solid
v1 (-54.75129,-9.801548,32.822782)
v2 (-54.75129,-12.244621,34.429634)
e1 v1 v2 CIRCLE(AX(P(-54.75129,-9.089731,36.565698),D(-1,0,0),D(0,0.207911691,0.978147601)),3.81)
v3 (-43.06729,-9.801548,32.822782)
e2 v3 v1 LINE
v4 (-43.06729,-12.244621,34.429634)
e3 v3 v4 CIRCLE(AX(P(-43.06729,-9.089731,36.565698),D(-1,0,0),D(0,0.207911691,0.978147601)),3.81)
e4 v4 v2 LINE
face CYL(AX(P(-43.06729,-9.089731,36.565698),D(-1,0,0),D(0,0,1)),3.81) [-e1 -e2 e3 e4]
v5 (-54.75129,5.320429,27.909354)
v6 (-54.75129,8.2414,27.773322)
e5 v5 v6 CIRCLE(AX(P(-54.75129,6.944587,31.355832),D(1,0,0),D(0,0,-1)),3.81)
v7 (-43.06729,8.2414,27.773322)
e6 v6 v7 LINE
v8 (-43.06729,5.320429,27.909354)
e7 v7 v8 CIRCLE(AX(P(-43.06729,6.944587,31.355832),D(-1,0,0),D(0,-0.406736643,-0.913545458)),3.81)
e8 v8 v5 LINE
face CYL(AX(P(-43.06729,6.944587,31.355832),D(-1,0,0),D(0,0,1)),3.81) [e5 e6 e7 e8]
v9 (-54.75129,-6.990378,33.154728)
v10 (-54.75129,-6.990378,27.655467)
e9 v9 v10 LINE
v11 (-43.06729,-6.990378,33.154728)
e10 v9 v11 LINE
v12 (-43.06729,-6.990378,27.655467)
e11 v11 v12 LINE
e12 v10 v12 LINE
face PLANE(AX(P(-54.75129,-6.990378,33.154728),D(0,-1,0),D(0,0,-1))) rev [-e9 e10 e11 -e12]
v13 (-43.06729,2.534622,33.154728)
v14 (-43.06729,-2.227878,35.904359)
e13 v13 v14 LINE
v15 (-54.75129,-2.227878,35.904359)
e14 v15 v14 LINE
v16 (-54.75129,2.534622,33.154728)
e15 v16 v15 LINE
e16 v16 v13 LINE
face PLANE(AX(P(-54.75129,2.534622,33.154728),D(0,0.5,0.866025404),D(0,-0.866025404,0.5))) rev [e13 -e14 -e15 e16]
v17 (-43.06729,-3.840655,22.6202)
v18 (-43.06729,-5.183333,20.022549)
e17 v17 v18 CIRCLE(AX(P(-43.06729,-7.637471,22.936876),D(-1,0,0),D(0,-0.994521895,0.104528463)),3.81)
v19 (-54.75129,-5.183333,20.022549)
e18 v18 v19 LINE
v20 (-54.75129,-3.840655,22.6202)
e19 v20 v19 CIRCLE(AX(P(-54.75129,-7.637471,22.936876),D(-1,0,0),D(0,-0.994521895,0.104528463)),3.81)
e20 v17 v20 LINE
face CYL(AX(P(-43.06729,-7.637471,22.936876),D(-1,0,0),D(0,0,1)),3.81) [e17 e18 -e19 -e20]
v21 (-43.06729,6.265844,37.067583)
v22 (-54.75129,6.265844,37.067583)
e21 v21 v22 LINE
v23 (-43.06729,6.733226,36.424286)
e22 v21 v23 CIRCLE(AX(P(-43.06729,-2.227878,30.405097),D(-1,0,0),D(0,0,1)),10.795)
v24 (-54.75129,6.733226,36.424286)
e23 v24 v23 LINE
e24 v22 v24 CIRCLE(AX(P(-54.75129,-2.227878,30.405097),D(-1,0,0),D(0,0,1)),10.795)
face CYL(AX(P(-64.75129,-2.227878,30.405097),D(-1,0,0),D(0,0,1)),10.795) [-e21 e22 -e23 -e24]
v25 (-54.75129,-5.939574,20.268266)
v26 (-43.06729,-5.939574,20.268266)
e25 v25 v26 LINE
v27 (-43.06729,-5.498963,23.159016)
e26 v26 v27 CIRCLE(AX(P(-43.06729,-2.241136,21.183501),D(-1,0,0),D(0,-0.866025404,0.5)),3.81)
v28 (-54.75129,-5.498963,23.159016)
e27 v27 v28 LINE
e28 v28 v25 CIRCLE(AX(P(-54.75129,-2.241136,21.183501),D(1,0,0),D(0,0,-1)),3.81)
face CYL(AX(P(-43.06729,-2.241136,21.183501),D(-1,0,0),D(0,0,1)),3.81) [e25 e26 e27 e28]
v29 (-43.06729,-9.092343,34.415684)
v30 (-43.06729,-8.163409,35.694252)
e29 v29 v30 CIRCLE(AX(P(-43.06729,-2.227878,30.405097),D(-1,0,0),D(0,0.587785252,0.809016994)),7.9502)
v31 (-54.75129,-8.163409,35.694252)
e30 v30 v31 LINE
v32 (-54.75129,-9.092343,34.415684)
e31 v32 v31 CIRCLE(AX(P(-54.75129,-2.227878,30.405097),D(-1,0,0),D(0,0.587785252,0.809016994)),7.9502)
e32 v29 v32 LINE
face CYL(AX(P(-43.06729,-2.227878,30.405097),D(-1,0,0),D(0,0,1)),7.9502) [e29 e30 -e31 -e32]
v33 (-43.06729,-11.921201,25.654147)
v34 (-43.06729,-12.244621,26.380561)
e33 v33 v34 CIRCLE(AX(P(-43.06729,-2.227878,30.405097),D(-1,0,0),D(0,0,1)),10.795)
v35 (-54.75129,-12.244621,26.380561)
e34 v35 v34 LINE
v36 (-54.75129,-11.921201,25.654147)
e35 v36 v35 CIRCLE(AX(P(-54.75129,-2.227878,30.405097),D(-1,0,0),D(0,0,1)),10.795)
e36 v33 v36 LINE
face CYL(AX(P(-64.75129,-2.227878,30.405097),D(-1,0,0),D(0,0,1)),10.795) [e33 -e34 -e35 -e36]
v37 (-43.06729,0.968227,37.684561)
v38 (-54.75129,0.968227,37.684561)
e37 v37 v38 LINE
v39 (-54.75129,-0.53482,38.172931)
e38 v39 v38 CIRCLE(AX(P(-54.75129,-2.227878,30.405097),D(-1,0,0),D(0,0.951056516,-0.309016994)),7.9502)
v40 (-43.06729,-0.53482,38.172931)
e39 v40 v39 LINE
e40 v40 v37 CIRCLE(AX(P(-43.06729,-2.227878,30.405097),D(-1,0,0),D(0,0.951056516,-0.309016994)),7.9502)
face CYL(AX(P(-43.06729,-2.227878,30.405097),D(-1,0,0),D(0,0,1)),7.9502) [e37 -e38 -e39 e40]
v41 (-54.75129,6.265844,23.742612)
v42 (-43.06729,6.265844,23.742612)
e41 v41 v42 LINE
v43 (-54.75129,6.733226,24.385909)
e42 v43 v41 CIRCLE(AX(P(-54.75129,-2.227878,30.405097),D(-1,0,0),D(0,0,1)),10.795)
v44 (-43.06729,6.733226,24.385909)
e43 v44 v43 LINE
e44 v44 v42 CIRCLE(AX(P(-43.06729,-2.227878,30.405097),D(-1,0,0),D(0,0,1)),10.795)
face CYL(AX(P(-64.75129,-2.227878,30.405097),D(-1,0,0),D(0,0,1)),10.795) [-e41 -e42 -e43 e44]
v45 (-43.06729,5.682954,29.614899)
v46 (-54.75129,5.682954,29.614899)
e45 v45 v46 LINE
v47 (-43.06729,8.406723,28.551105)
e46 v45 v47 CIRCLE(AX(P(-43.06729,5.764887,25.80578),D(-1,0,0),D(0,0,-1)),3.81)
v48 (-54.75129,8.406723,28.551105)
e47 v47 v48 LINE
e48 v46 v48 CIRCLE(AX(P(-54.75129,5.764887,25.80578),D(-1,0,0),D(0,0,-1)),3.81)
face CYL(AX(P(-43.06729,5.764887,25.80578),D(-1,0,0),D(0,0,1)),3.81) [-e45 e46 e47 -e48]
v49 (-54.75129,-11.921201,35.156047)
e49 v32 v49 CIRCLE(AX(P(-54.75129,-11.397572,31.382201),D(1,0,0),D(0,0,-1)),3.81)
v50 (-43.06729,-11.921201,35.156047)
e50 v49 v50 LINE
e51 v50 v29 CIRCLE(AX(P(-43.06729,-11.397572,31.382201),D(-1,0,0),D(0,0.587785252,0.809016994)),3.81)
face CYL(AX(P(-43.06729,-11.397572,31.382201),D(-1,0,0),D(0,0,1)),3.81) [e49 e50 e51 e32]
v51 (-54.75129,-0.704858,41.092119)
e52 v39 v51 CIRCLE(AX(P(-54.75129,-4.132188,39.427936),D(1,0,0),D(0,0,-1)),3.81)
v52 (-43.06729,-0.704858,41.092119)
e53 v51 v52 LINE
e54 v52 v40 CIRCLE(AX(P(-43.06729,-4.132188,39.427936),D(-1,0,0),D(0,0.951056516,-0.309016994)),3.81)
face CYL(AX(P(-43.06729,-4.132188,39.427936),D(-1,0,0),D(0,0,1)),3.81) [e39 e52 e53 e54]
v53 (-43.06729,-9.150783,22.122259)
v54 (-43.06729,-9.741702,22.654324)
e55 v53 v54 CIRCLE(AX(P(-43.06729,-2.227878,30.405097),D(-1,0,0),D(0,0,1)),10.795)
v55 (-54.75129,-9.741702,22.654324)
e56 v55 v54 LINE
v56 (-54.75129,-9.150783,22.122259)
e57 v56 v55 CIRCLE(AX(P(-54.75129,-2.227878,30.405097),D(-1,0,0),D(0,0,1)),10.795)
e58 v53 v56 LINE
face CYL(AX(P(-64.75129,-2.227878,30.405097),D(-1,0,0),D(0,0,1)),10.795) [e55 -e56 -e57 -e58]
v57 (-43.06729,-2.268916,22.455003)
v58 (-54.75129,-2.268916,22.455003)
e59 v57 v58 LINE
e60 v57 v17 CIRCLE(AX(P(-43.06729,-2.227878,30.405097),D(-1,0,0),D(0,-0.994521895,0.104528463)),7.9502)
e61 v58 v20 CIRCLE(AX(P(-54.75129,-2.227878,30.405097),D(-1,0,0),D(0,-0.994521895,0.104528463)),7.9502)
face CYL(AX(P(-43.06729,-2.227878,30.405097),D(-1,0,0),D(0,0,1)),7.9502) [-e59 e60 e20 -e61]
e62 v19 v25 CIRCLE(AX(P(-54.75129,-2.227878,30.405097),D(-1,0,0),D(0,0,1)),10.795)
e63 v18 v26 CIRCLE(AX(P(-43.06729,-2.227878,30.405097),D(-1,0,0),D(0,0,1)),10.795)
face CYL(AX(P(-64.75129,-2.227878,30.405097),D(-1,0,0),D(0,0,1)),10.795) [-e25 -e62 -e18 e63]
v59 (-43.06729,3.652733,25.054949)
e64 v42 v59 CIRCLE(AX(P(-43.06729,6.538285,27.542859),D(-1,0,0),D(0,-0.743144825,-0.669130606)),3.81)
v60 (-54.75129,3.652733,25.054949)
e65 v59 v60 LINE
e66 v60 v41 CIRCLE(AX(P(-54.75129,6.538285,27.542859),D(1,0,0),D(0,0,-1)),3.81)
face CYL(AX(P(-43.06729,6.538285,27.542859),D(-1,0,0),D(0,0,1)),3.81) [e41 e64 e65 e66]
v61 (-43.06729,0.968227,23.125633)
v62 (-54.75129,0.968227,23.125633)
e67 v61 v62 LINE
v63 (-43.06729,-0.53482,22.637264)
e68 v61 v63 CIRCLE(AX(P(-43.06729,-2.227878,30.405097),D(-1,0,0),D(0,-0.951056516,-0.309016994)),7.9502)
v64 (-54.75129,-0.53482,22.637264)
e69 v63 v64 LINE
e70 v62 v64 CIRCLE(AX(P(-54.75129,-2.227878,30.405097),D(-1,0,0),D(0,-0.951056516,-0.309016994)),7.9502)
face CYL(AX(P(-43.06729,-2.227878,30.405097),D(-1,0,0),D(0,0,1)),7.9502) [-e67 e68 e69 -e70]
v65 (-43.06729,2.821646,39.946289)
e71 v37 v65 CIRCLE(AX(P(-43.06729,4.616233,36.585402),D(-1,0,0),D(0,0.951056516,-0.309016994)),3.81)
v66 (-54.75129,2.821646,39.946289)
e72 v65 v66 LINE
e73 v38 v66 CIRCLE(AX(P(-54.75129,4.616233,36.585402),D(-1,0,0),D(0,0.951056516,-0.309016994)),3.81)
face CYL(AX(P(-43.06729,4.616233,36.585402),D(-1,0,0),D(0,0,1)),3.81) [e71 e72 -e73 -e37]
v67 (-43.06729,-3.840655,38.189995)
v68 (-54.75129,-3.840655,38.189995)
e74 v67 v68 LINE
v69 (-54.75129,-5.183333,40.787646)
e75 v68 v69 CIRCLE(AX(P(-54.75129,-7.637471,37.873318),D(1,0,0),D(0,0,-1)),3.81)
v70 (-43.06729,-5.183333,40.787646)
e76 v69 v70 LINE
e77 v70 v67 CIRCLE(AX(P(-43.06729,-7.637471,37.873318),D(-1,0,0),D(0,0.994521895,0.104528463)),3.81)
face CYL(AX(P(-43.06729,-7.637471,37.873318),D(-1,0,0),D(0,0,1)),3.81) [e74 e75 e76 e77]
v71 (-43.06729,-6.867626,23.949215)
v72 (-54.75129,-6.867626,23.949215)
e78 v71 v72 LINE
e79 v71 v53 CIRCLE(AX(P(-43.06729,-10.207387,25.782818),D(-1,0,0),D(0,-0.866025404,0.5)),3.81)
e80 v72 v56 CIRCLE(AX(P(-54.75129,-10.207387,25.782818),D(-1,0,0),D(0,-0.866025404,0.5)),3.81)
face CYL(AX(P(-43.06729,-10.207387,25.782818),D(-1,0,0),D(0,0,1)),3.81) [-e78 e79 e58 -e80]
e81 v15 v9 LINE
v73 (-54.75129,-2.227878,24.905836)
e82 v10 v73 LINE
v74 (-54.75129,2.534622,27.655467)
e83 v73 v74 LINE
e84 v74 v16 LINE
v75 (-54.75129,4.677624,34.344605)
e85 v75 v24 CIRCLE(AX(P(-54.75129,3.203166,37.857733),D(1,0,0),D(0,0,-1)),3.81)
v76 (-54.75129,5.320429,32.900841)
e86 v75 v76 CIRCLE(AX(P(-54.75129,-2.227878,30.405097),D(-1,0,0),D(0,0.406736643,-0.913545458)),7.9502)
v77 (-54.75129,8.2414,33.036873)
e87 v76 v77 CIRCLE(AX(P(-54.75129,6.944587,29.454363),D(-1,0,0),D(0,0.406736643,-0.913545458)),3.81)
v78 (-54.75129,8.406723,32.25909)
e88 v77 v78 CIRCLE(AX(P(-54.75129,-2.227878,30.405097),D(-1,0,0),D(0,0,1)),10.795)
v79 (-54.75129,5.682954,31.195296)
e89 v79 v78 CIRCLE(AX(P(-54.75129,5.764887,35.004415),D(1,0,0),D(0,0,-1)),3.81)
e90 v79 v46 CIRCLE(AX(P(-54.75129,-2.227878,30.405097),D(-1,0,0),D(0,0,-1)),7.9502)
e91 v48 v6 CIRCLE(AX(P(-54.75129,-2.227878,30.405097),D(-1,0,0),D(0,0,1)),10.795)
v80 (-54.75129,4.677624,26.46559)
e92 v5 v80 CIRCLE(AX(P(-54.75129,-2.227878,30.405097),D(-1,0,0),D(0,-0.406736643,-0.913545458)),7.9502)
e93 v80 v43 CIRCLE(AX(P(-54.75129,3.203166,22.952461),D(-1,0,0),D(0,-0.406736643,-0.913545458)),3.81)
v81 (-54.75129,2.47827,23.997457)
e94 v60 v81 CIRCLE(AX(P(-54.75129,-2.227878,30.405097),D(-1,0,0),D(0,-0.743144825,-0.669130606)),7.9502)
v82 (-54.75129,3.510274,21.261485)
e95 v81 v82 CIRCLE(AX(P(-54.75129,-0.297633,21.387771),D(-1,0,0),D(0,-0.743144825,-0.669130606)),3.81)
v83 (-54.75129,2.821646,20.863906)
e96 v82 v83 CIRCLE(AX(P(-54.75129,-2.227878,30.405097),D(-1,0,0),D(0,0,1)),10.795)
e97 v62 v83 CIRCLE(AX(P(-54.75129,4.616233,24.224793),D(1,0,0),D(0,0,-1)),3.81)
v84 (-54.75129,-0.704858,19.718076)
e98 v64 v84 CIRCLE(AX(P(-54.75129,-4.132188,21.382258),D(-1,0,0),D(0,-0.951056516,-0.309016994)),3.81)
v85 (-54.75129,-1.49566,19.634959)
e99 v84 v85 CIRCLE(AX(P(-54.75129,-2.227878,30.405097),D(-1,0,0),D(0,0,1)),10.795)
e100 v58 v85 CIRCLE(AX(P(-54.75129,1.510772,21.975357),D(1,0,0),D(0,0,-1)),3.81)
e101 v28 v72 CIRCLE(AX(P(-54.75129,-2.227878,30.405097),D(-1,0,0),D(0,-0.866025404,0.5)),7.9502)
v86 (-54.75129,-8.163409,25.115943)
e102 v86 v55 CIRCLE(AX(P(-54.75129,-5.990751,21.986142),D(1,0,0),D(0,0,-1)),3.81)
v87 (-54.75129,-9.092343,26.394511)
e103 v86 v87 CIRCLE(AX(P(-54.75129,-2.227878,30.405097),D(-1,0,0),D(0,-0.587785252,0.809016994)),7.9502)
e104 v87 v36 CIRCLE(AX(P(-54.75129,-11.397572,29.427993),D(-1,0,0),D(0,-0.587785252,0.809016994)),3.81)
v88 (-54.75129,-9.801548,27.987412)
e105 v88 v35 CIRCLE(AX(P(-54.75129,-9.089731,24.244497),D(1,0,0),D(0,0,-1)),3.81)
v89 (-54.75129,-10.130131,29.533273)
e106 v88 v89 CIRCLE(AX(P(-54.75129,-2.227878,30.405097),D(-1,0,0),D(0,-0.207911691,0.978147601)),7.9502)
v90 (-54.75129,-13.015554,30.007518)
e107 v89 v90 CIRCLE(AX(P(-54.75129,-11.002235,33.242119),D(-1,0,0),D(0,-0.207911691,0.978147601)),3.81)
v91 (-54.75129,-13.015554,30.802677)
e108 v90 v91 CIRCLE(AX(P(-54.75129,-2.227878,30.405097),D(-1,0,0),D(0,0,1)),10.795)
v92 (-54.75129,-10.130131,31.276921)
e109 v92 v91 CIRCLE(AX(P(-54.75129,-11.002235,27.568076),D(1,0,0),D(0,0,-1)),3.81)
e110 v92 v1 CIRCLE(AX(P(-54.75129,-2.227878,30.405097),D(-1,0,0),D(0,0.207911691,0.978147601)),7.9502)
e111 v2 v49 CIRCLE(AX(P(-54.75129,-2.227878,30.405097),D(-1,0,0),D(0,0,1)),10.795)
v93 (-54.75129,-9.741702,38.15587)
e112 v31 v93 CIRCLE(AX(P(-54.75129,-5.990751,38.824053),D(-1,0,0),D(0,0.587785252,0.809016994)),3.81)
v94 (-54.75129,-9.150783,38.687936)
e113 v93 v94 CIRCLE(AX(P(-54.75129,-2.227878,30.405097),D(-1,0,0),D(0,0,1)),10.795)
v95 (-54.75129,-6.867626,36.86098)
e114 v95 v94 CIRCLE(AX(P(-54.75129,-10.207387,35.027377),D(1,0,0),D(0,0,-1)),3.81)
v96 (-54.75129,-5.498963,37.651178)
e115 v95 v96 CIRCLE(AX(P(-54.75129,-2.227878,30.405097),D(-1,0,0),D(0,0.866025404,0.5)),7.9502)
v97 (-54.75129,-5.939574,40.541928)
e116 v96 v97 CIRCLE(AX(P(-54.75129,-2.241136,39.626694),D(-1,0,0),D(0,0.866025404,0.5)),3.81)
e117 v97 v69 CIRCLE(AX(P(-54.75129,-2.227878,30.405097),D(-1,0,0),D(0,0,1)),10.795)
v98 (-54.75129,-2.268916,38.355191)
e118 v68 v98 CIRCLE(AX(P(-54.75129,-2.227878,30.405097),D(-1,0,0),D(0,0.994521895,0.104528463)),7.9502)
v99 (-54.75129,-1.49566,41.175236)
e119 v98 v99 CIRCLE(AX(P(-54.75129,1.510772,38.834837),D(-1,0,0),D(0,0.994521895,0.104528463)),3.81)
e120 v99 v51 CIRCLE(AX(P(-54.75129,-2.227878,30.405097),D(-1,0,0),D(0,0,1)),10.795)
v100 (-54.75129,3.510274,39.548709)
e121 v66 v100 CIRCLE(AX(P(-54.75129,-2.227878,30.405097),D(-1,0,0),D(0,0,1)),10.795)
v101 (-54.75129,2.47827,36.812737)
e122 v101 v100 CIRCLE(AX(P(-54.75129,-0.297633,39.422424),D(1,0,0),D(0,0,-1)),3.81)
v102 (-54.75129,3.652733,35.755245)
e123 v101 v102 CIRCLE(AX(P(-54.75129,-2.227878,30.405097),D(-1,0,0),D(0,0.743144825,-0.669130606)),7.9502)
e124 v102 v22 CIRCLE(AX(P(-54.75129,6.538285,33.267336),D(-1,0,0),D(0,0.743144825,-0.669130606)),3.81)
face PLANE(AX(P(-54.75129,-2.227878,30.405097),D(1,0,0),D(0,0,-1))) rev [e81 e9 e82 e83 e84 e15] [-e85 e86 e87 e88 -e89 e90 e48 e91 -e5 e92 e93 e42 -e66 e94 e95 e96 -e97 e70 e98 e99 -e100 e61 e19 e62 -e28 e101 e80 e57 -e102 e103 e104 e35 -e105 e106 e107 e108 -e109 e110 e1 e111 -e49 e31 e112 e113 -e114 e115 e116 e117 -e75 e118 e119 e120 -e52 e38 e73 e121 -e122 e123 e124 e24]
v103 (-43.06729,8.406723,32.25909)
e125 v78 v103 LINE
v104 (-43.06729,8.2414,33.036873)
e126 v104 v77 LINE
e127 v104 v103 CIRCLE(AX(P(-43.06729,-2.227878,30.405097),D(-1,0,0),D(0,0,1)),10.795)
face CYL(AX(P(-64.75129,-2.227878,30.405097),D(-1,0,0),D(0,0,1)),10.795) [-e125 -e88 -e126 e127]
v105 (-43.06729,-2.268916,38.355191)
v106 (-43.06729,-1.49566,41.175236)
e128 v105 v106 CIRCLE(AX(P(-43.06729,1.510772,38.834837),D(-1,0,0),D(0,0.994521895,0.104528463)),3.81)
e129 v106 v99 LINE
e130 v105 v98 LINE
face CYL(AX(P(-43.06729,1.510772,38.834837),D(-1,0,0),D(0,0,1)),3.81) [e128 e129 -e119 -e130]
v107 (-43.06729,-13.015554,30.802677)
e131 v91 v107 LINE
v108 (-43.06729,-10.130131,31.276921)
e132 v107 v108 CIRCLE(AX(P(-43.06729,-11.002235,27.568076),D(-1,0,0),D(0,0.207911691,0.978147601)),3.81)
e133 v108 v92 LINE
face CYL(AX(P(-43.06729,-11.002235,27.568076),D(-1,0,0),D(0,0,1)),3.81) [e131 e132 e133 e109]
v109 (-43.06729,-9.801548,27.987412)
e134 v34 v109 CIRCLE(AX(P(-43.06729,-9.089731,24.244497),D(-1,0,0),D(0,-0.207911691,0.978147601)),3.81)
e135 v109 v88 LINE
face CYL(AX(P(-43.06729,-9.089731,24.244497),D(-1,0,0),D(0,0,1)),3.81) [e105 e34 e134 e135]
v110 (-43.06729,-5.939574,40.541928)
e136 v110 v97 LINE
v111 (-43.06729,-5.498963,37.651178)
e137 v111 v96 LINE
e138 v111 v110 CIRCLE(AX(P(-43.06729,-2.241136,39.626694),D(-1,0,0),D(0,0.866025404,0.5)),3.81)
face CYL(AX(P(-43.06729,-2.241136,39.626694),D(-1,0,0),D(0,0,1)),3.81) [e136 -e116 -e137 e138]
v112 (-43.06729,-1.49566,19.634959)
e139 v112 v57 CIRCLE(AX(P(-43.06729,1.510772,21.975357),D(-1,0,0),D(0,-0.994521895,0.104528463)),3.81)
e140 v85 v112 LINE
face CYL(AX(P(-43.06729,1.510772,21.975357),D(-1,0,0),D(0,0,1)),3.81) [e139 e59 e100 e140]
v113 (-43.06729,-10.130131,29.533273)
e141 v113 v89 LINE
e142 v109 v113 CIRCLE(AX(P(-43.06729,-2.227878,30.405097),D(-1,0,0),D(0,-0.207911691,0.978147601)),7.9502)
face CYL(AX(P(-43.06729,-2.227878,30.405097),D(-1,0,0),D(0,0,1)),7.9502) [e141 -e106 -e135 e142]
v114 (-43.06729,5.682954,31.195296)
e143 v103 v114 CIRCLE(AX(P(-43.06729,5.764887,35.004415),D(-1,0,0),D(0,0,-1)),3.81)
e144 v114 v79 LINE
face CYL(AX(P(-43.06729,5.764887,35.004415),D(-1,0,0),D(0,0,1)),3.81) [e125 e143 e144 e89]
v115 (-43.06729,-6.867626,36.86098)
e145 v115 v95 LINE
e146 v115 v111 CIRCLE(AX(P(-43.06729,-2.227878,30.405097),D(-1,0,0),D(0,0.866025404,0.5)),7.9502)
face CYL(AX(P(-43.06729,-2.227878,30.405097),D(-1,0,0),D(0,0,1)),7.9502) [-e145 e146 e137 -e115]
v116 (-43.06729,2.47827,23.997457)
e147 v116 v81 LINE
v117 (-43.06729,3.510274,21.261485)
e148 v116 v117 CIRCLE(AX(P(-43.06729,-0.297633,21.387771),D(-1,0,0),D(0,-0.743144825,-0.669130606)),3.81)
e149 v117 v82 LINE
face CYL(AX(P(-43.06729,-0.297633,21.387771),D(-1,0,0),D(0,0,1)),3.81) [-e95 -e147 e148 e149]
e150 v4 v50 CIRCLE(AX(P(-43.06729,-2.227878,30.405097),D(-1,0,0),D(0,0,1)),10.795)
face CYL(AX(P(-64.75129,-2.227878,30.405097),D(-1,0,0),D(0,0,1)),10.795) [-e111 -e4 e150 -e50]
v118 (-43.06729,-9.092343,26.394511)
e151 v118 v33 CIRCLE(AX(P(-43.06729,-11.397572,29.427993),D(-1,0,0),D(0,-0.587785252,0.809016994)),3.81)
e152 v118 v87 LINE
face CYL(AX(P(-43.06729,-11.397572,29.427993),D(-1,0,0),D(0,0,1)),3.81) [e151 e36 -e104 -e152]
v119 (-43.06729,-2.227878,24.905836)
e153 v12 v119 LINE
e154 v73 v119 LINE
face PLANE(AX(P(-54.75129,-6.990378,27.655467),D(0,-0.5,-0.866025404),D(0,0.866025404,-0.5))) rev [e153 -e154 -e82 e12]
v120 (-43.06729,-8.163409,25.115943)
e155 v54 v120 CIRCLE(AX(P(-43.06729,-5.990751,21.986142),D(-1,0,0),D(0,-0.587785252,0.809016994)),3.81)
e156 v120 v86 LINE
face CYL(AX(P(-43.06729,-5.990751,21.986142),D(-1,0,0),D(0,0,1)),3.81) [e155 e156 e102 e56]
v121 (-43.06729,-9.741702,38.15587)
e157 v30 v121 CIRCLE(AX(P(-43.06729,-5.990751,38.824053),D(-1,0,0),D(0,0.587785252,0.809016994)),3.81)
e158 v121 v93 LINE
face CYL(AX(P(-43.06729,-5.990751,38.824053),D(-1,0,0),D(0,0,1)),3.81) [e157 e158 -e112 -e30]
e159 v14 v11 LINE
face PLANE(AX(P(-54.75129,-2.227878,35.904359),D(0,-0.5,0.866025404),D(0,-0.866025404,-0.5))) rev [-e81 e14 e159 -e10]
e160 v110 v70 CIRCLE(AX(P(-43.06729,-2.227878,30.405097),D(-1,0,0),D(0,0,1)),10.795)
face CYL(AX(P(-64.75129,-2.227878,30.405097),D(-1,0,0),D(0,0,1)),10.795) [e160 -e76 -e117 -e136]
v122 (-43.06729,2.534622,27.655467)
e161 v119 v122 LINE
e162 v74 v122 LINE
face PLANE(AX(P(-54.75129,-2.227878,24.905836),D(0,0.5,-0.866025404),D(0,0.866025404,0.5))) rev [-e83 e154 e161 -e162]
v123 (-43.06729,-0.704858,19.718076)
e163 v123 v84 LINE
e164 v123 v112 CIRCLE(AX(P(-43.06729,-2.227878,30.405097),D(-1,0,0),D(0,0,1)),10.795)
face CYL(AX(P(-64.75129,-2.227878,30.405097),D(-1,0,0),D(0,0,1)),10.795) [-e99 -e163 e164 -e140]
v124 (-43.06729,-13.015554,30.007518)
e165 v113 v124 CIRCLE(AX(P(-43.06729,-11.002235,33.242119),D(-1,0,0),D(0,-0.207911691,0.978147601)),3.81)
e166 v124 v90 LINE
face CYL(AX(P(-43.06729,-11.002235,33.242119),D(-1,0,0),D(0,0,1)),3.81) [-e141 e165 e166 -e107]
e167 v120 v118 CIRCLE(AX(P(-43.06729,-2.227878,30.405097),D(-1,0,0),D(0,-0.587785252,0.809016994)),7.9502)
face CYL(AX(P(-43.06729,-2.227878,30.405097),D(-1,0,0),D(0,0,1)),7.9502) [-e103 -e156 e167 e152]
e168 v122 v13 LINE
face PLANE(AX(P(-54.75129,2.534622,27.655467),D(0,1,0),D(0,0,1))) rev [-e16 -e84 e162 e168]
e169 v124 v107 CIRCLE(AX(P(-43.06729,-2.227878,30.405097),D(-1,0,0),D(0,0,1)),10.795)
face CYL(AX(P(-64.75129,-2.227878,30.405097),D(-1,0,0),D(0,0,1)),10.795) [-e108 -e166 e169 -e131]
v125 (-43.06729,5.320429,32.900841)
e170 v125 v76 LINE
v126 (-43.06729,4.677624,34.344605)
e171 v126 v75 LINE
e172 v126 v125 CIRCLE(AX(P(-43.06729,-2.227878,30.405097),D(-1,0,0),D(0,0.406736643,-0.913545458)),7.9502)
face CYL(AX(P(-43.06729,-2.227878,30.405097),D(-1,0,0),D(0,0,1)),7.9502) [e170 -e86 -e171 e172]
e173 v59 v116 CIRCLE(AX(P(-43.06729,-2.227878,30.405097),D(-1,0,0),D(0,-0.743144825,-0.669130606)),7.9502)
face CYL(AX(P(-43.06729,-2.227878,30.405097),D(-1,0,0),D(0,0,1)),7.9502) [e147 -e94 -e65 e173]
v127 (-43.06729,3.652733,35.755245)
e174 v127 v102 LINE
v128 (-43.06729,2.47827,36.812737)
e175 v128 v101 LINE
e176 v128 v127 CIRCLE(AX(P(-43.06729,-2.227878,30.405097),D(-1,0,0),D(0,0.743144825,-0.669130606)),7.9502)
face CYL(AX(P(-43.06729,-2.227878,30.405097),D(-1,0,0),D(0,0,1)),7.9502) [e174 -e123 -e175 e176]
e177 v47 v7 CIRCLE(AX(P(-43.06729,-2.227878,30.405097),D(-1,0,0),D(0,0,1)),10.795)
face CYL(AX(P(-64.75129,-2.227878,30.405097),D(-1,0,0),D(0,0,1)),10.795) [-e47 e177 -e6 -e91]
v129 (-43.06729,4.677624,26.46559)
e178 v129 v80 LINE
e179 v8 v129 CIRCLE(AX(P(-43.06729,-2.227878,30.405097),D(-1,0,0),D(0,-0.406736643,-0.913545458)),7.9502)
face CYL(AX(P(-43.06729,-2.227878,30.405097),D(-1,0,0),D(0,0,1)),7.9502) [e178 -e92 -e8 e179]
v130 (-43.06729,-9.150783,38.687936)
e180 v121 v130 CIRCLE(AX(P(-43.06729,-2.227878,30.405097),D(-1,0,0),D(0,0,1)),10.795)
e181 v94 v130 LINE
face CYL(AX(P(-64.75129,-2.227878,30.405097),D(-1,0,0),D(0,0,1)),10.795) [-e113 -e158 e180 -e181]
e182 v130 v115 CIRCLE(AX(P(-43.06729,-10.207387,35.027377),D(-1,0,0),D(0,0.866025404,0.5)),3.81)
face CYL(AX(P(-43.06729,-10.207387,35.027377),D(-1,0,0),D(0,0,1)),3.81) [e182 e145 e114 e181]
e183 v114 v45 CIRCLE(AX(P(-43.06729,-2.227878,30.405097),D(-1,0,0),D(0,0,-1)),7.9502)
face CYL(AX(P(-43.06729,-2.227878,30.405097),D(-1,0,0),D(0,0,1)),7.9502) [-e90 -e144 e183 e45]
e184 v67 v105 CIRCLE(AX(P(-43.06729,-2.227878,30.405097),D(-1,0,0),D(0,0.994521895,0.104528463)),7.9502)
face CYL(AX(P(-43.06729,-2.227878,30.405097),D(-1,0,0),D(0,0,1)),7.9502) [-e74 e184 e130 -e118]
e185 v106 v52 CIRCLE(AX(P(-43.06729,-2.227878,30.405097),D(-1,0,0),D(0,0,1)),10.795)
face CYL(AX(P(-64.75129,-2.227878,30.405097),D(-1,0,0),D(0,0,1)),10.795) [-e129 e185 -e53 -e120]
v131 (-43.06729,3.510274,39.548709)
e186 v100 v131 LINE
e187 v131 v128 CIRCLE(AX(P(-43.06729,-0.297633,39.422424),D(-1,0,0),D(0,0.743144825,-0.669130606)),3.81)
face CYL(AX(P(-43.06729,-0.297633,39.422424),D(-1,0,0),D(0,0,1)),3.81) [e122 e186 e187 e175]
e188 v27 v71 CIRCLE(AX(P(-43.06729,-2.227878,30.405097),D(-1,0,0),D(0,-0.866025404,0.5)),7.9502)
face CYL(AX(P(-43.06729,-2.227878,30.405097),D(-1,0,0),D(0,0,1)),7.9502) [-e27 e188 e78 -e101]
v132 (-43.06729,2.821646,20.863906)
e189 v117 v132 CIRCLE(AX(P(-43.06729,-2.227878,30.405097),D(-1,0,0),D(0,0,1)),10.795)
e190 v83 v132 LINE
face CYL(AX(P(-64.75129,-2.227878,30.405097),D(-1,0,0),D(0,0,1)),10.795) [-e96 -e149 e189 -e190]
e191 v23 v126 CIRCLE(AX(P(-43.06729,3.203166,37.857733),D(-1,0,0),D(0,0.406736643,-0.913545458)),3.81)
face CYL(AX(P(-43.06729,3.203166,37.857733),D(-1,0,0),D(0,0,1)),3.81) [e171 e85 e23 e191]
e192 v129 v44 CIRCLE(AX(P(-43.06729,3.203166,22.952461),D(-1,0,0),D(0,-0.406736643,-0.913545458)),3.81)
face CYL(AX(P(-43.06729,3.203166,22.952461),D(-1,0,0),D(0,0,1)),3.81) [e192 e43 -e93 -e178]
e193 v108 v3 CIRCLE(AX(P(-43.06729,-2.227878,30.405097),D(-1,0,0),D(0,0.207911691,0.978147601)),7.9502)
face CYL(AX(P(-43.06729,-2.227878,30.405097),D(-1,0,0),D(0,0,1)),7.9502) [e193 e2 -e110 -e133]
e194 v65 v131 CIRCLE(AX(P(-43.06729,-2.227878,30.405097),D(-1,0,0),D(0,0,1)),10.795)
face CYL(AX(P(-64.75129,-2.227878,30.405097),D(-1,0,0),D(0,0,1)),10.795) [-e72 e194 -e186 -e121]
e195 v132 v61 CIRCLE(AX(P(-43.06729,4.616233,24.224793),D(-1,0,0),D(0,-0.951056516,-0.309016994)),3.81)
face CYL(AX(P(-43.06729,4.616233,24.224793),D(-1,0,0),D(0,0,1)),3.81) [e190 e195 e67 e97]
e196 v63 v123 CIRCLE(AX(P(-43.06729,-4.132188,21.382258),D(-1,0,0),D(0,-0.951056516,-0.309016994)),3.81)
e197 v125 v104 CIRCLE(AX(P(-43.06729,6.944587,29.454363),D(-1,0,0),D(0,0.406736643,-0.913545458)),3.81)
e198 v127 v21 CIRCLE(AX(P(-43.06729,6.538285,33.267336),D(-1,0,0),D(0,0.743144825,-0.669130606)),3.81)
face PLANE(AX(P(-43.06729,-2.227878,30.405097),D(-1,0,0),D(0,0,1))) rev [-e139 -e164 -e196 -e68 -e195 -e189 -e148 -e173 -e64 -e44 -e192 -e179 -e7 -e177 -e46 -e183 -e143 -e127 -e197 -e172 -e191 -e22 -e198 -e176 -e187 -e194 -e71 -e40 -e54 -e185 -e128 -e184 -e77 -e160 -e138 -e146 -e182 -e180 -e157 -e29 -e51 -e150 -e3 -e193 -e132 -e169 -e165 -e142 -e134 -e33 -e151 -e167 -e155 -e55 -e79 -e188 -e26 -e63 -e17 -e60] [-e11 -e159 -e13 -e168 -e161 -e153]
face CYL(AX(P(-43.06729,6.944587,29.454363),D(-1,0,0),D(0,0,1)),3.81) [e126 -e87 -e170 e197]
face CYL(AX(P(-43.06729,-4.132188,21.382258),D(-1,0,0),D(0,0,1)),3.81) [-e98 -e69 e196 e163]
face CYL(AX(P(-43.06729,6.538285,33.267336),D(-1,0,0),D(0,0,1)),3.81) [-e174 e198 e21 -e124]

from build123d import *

# Parameters (mm, degrees)
SPUR_START             = -54.751290346
SPUR_GEAR_AI_OUTLINE_R = 4.7625
SPUR_GEAR_AI_DEPTH     = 11.684
CUT_EXTRUDE1_DEPTH     = 45.73825268


# Read off the part's stored shape, not the designer's step: spur gear_ai
with BuildPart() as part:
    # spur gear_ai outline → spur gear_ai (new body)
    with BuildSketch(Plane.YZ.offset(SPUR_START)):
        with BuildLine():
            ThreePointArc((6.265843754, 23.742611923), (6.505460201, 24.059955507), (6.73322633, 24.385908852))
            ThreePointArc((6.73322633, 24.385908852), (5.912883536, 25.630805773), (4.677624003, 26.465589895))
            ThreePointArc((4.677624003, 26.465589895), (5.034990844, 27.171459646), (5.320429206, 27.90935402))
            ThreePointArc((5.320429206, 27.90935402), (6.767344667, 27.549956895), (8.241399844, 27.773322024))
            ThreePointArc((8.241399844, 27.773322024), (8.331225097, 28.160690604), (8.40672264, 28.551104632))
            ThreePointArc((8.40672264, 28.551104632), (7.150957012, 29.354711085), (5.682953985, 29.614899012))
            ThreePointArc((5.682953985, 29.614899012), (5.722321747, 30.405097306), (5.682953985, 31.1952956))
            ThreePointArc((5.682953985, 31.1952956), (7.150957012, 31.455483527), (8.40672264, 32.25908998))
            ThreePointArc((8.40672264, 32.25908998), (8.331225097, 32.649504008), (8.241399844, 33.036872588))
            ThreePointArc((8.241399844, 33.036872588), (6.767344667, 33.260237716), (5.320429206, 32.900840592))
            ThreePointArc((5.320429206, 32.900840592), (5.034990844, 33.638734965), (4.677624003, 34.344604716))
            ThreePointArc((4.677624003, 34.344604716), (5.912883536, 35.179388839), (6.73322633, 36.42428576))
            ThreePointArc((6.73322633, 36.42428576), (6.505460201, 36.750239104), (6.265843754, 37.067582688))
            ThreePointArc((6.265843754, 37.067582688), (4.82837656, 36.672084633), (3.652733492, 35.755245485))
            ThreePointArc((3.652733492, 35.755245485), (3.091843894, 36.313247297), (2.478269946, 36.812737212))
            ThreePointArc((2.478269946, 36.812737212), (3.26719839, 38.077775771), (3.510273629, 39.548709173))
            ThreePointArc((3.510273629, 39.548709173), (3.169621747, 39.75384154), (2.821645965, 39.94628854))
            ThreePointArc((2.821645965, 39.94628854), (1.669317892, 39.000312507), (0.968226585, 37.684561153))
            ThreePointArc((0.968226585, 37.684561153), (0.228868656, 37.966186822), (-0.534819889, 38.172930557))
            ThreePointArc((-0.534819889, 38.172930557), (-0.328635429, 39.649486893), (-0.704857663, 41.092119028))
            ThreePointArc((-0.704857663, 41.092119028), (-1.099493493, 41.140961166), (-1.495660434, 41.175235748))
            ThreePointArc((-1.495660434, 41.175235748), (-2.163601395, 39.842349587), (-2.268915885, 38.35519139))
            ThreePointArc((-2.268915885, 38.35519139), (-3.058900442, 38.311745278), (-3.840654895, 38.189994964))
            ThreePointArc((-3.840654895, 38.189994964), (-4.252865586, 39.622759072), (-5.18333305, 40.787645738))
            ThreePointArc((-5.18333305, 40.787645738), (-5.563716707, 40.671752399), (-5.939573945, 40.541928176))
            ThreePointArc((-5.939573945, 40.541928176), (-6.007634734, 39.052600014), (-5.498962575, 37.651178136))
            ThreePointArc((-5.498962575, 37.651178136), (-6.202978253, 37.290172471), (-6.867626169, 36.860979842))
            ThreePointArc((-6.867626169, 36.860979842), (-7.826957037, 38.002213793), (-9.150783454, 38.687935502))
            ThreePointArc((-9.150783454, 38.687935502), (-9.451143149, 38.427345697), (-9.741701553, 38.155870456))
            ThreePointArc((-9.741701553, 38.155870456), (-9.19811384, 36.767618662), (-8.16340907, 35.694251677))
            ThreePointArc((-8.16340907, 35.694251677), (-8.659725162, 35.078107619), (-9.092342877, 34.41568398))
            ThreePointArc((-9.092342877, 34.41568398), (-10.4329169, 35.068058055), (-11.921200656, 35.156047294))
            ThreePointArc((-11.921200656, 35.156047294), (-12.089601468, 34.795819368), (-12.24462085, 34.429633645))
            ThreePointArc((-12.24462085, 34.429633645), (-11.18337589, 33.382499566), (-9.801548363, 32.822782378))
            ThreePointArc((-9.801548363, 32.822782378), (-10.004347308, 32.05803683), (-10.13013129, 31.276921247))
            ThreePointArc((-10.13013129, 31.276921247), (-11.62015104, 31.327634041), (-13.015554353, 30.802676673))
            ThreePointArc((-13.015554353, 30.802676673), (-13.022878253, 30.405097306), (-13.015554353, 30.007517939))
            ThreePointArc((-13.015554353, 30.007517939), (-11.62015104, 29.48256057), (-10.13013129, 29.533273365))
            ThreePointArc((-10.13013129, 29.533273365), (-10.004347308, 28.752157782), (-9.801548363, 27.987412234))
            ThreePointArc((-9.801548363, 27.987412234), (-11.18337589, 27.427695046), (-12.24462085, 26.380560967))
            ThreePointArc((-12.24462085, 26.380560967), (-12.089601468, 26.014375244), (-11.921200656, 25.654147317))
            ThreePointArc((-11.921200656, 25.654147317), (-10.4329169, 25.742136557), (-9.092342877, 26.394510632))
            ThreePointArc((-9.092342877, 26.394510632), (-8.659725162, 25.732086993), (-8.16340907, 25.115942934))
            ThreePointArc((-8.16340907, 25.115942934), (-9.19811384, 24.04257595), (-9.741701553, 22.654324156))
            ThreePointArc((-9.741701553, 22.654324156), (-9.451143149, 22.382848915), (-9.150783454, 22.12225911))
            ThreePointArc((-9.150783454, 22.12225911), (-7.826957037, 22.807980819), (-6.867626169, 23.94921477))
            ThreePointArc((-6.867626169, 23.94921477), (-6.202978253, 23.520022141), (-5.498962575, 23.159016476))
            ThreePointArc((-5.498962575, 23.159016476), (-6.007634734, 21.757594598), (-5.939573945, 20.268266436))
            ThreePointArc((-5.939573945, 20.268266436), (-5.563716707, 20.138442212), (-5.18333305, 20.022548874))
            ThreePointArc((-5.18333305, 20.022548874), (-4.252865586, 21.187435539), (-3.840654895, 22.620199648))
            ThreePointArc((-3.840654895, 22.620199648), (-3.058900442, 22.498449333), (-2.268915885, 22.455003221))
            ThreePointArc((-2.268915885, 22.455003221), (-2.163601395, 20.967845024), (-1.495660434, 19.634958864))
            ThreePointArc((-1.495660434, 19.634958864), (-1.099493492, 19.669233445), (-0.704857663, 19.718075584))
            ThreePointArc((-0.704857663, 19.718075584), (-0.328635429, 21.160707719), (-0.534819889, 22.637264055))
            ThreePointArc((-0.534819889, 22.637264055), (0.228868655, 22.84400779), (0.968226585, 23.125633458))
            ThreePointArc((0.968226585, 23.125633458), (1.669317892, 21.809882105), (2.821645965, 20.863906072))
            ThreePointArc((2.821645965, 20.863906072), (3.169621747, 21.056353072), (3.510273629, 21.261485438))
            ThreePointArc((3.510273629, 21.261485438), (3.26719839, 22.73241884), (2.478269946, 23.997457399))
            ThreePointArc((2.478269946, 23.997457399), (3.091843894, 24.496947314), (3.652733492, 25.054949127))
            ThreePointArc((3.652733492, 25.054949127), (4.82837656, 24.138109979), (6.265843754, 23.742611923))
        make_face()
        with Locations((-2.227878253, 30.405097306)):
            Circle(SPUR_GEAR_AI_OUTLINE_R, mode=Mode.SUBTRACT)
    extrude(amount=SPUR_GEAR_AI_DEPTH)

    # Sketch1 → Cut-Extrude1 (cut, through all)
    with BuildSketch(Plane(origin=(-43.067290346, 0, 0), x_dir=(0, 0, -1), z_dir=(1, 0, 0))):
        Polygon((-27.655466649, 2.534621747), (-33.154727963, 2.534621747), (-35.90435862, -2.227878253), (-33.154727963, -6.990378253), (-27.655466649, -6.990378253), (-24.905835992, -2.227878253), align=None)
    extrude(amount=-CUT_EXTRUDE1_DEPTH, mode=Mode.SUBTRACT)


solid = part.part
